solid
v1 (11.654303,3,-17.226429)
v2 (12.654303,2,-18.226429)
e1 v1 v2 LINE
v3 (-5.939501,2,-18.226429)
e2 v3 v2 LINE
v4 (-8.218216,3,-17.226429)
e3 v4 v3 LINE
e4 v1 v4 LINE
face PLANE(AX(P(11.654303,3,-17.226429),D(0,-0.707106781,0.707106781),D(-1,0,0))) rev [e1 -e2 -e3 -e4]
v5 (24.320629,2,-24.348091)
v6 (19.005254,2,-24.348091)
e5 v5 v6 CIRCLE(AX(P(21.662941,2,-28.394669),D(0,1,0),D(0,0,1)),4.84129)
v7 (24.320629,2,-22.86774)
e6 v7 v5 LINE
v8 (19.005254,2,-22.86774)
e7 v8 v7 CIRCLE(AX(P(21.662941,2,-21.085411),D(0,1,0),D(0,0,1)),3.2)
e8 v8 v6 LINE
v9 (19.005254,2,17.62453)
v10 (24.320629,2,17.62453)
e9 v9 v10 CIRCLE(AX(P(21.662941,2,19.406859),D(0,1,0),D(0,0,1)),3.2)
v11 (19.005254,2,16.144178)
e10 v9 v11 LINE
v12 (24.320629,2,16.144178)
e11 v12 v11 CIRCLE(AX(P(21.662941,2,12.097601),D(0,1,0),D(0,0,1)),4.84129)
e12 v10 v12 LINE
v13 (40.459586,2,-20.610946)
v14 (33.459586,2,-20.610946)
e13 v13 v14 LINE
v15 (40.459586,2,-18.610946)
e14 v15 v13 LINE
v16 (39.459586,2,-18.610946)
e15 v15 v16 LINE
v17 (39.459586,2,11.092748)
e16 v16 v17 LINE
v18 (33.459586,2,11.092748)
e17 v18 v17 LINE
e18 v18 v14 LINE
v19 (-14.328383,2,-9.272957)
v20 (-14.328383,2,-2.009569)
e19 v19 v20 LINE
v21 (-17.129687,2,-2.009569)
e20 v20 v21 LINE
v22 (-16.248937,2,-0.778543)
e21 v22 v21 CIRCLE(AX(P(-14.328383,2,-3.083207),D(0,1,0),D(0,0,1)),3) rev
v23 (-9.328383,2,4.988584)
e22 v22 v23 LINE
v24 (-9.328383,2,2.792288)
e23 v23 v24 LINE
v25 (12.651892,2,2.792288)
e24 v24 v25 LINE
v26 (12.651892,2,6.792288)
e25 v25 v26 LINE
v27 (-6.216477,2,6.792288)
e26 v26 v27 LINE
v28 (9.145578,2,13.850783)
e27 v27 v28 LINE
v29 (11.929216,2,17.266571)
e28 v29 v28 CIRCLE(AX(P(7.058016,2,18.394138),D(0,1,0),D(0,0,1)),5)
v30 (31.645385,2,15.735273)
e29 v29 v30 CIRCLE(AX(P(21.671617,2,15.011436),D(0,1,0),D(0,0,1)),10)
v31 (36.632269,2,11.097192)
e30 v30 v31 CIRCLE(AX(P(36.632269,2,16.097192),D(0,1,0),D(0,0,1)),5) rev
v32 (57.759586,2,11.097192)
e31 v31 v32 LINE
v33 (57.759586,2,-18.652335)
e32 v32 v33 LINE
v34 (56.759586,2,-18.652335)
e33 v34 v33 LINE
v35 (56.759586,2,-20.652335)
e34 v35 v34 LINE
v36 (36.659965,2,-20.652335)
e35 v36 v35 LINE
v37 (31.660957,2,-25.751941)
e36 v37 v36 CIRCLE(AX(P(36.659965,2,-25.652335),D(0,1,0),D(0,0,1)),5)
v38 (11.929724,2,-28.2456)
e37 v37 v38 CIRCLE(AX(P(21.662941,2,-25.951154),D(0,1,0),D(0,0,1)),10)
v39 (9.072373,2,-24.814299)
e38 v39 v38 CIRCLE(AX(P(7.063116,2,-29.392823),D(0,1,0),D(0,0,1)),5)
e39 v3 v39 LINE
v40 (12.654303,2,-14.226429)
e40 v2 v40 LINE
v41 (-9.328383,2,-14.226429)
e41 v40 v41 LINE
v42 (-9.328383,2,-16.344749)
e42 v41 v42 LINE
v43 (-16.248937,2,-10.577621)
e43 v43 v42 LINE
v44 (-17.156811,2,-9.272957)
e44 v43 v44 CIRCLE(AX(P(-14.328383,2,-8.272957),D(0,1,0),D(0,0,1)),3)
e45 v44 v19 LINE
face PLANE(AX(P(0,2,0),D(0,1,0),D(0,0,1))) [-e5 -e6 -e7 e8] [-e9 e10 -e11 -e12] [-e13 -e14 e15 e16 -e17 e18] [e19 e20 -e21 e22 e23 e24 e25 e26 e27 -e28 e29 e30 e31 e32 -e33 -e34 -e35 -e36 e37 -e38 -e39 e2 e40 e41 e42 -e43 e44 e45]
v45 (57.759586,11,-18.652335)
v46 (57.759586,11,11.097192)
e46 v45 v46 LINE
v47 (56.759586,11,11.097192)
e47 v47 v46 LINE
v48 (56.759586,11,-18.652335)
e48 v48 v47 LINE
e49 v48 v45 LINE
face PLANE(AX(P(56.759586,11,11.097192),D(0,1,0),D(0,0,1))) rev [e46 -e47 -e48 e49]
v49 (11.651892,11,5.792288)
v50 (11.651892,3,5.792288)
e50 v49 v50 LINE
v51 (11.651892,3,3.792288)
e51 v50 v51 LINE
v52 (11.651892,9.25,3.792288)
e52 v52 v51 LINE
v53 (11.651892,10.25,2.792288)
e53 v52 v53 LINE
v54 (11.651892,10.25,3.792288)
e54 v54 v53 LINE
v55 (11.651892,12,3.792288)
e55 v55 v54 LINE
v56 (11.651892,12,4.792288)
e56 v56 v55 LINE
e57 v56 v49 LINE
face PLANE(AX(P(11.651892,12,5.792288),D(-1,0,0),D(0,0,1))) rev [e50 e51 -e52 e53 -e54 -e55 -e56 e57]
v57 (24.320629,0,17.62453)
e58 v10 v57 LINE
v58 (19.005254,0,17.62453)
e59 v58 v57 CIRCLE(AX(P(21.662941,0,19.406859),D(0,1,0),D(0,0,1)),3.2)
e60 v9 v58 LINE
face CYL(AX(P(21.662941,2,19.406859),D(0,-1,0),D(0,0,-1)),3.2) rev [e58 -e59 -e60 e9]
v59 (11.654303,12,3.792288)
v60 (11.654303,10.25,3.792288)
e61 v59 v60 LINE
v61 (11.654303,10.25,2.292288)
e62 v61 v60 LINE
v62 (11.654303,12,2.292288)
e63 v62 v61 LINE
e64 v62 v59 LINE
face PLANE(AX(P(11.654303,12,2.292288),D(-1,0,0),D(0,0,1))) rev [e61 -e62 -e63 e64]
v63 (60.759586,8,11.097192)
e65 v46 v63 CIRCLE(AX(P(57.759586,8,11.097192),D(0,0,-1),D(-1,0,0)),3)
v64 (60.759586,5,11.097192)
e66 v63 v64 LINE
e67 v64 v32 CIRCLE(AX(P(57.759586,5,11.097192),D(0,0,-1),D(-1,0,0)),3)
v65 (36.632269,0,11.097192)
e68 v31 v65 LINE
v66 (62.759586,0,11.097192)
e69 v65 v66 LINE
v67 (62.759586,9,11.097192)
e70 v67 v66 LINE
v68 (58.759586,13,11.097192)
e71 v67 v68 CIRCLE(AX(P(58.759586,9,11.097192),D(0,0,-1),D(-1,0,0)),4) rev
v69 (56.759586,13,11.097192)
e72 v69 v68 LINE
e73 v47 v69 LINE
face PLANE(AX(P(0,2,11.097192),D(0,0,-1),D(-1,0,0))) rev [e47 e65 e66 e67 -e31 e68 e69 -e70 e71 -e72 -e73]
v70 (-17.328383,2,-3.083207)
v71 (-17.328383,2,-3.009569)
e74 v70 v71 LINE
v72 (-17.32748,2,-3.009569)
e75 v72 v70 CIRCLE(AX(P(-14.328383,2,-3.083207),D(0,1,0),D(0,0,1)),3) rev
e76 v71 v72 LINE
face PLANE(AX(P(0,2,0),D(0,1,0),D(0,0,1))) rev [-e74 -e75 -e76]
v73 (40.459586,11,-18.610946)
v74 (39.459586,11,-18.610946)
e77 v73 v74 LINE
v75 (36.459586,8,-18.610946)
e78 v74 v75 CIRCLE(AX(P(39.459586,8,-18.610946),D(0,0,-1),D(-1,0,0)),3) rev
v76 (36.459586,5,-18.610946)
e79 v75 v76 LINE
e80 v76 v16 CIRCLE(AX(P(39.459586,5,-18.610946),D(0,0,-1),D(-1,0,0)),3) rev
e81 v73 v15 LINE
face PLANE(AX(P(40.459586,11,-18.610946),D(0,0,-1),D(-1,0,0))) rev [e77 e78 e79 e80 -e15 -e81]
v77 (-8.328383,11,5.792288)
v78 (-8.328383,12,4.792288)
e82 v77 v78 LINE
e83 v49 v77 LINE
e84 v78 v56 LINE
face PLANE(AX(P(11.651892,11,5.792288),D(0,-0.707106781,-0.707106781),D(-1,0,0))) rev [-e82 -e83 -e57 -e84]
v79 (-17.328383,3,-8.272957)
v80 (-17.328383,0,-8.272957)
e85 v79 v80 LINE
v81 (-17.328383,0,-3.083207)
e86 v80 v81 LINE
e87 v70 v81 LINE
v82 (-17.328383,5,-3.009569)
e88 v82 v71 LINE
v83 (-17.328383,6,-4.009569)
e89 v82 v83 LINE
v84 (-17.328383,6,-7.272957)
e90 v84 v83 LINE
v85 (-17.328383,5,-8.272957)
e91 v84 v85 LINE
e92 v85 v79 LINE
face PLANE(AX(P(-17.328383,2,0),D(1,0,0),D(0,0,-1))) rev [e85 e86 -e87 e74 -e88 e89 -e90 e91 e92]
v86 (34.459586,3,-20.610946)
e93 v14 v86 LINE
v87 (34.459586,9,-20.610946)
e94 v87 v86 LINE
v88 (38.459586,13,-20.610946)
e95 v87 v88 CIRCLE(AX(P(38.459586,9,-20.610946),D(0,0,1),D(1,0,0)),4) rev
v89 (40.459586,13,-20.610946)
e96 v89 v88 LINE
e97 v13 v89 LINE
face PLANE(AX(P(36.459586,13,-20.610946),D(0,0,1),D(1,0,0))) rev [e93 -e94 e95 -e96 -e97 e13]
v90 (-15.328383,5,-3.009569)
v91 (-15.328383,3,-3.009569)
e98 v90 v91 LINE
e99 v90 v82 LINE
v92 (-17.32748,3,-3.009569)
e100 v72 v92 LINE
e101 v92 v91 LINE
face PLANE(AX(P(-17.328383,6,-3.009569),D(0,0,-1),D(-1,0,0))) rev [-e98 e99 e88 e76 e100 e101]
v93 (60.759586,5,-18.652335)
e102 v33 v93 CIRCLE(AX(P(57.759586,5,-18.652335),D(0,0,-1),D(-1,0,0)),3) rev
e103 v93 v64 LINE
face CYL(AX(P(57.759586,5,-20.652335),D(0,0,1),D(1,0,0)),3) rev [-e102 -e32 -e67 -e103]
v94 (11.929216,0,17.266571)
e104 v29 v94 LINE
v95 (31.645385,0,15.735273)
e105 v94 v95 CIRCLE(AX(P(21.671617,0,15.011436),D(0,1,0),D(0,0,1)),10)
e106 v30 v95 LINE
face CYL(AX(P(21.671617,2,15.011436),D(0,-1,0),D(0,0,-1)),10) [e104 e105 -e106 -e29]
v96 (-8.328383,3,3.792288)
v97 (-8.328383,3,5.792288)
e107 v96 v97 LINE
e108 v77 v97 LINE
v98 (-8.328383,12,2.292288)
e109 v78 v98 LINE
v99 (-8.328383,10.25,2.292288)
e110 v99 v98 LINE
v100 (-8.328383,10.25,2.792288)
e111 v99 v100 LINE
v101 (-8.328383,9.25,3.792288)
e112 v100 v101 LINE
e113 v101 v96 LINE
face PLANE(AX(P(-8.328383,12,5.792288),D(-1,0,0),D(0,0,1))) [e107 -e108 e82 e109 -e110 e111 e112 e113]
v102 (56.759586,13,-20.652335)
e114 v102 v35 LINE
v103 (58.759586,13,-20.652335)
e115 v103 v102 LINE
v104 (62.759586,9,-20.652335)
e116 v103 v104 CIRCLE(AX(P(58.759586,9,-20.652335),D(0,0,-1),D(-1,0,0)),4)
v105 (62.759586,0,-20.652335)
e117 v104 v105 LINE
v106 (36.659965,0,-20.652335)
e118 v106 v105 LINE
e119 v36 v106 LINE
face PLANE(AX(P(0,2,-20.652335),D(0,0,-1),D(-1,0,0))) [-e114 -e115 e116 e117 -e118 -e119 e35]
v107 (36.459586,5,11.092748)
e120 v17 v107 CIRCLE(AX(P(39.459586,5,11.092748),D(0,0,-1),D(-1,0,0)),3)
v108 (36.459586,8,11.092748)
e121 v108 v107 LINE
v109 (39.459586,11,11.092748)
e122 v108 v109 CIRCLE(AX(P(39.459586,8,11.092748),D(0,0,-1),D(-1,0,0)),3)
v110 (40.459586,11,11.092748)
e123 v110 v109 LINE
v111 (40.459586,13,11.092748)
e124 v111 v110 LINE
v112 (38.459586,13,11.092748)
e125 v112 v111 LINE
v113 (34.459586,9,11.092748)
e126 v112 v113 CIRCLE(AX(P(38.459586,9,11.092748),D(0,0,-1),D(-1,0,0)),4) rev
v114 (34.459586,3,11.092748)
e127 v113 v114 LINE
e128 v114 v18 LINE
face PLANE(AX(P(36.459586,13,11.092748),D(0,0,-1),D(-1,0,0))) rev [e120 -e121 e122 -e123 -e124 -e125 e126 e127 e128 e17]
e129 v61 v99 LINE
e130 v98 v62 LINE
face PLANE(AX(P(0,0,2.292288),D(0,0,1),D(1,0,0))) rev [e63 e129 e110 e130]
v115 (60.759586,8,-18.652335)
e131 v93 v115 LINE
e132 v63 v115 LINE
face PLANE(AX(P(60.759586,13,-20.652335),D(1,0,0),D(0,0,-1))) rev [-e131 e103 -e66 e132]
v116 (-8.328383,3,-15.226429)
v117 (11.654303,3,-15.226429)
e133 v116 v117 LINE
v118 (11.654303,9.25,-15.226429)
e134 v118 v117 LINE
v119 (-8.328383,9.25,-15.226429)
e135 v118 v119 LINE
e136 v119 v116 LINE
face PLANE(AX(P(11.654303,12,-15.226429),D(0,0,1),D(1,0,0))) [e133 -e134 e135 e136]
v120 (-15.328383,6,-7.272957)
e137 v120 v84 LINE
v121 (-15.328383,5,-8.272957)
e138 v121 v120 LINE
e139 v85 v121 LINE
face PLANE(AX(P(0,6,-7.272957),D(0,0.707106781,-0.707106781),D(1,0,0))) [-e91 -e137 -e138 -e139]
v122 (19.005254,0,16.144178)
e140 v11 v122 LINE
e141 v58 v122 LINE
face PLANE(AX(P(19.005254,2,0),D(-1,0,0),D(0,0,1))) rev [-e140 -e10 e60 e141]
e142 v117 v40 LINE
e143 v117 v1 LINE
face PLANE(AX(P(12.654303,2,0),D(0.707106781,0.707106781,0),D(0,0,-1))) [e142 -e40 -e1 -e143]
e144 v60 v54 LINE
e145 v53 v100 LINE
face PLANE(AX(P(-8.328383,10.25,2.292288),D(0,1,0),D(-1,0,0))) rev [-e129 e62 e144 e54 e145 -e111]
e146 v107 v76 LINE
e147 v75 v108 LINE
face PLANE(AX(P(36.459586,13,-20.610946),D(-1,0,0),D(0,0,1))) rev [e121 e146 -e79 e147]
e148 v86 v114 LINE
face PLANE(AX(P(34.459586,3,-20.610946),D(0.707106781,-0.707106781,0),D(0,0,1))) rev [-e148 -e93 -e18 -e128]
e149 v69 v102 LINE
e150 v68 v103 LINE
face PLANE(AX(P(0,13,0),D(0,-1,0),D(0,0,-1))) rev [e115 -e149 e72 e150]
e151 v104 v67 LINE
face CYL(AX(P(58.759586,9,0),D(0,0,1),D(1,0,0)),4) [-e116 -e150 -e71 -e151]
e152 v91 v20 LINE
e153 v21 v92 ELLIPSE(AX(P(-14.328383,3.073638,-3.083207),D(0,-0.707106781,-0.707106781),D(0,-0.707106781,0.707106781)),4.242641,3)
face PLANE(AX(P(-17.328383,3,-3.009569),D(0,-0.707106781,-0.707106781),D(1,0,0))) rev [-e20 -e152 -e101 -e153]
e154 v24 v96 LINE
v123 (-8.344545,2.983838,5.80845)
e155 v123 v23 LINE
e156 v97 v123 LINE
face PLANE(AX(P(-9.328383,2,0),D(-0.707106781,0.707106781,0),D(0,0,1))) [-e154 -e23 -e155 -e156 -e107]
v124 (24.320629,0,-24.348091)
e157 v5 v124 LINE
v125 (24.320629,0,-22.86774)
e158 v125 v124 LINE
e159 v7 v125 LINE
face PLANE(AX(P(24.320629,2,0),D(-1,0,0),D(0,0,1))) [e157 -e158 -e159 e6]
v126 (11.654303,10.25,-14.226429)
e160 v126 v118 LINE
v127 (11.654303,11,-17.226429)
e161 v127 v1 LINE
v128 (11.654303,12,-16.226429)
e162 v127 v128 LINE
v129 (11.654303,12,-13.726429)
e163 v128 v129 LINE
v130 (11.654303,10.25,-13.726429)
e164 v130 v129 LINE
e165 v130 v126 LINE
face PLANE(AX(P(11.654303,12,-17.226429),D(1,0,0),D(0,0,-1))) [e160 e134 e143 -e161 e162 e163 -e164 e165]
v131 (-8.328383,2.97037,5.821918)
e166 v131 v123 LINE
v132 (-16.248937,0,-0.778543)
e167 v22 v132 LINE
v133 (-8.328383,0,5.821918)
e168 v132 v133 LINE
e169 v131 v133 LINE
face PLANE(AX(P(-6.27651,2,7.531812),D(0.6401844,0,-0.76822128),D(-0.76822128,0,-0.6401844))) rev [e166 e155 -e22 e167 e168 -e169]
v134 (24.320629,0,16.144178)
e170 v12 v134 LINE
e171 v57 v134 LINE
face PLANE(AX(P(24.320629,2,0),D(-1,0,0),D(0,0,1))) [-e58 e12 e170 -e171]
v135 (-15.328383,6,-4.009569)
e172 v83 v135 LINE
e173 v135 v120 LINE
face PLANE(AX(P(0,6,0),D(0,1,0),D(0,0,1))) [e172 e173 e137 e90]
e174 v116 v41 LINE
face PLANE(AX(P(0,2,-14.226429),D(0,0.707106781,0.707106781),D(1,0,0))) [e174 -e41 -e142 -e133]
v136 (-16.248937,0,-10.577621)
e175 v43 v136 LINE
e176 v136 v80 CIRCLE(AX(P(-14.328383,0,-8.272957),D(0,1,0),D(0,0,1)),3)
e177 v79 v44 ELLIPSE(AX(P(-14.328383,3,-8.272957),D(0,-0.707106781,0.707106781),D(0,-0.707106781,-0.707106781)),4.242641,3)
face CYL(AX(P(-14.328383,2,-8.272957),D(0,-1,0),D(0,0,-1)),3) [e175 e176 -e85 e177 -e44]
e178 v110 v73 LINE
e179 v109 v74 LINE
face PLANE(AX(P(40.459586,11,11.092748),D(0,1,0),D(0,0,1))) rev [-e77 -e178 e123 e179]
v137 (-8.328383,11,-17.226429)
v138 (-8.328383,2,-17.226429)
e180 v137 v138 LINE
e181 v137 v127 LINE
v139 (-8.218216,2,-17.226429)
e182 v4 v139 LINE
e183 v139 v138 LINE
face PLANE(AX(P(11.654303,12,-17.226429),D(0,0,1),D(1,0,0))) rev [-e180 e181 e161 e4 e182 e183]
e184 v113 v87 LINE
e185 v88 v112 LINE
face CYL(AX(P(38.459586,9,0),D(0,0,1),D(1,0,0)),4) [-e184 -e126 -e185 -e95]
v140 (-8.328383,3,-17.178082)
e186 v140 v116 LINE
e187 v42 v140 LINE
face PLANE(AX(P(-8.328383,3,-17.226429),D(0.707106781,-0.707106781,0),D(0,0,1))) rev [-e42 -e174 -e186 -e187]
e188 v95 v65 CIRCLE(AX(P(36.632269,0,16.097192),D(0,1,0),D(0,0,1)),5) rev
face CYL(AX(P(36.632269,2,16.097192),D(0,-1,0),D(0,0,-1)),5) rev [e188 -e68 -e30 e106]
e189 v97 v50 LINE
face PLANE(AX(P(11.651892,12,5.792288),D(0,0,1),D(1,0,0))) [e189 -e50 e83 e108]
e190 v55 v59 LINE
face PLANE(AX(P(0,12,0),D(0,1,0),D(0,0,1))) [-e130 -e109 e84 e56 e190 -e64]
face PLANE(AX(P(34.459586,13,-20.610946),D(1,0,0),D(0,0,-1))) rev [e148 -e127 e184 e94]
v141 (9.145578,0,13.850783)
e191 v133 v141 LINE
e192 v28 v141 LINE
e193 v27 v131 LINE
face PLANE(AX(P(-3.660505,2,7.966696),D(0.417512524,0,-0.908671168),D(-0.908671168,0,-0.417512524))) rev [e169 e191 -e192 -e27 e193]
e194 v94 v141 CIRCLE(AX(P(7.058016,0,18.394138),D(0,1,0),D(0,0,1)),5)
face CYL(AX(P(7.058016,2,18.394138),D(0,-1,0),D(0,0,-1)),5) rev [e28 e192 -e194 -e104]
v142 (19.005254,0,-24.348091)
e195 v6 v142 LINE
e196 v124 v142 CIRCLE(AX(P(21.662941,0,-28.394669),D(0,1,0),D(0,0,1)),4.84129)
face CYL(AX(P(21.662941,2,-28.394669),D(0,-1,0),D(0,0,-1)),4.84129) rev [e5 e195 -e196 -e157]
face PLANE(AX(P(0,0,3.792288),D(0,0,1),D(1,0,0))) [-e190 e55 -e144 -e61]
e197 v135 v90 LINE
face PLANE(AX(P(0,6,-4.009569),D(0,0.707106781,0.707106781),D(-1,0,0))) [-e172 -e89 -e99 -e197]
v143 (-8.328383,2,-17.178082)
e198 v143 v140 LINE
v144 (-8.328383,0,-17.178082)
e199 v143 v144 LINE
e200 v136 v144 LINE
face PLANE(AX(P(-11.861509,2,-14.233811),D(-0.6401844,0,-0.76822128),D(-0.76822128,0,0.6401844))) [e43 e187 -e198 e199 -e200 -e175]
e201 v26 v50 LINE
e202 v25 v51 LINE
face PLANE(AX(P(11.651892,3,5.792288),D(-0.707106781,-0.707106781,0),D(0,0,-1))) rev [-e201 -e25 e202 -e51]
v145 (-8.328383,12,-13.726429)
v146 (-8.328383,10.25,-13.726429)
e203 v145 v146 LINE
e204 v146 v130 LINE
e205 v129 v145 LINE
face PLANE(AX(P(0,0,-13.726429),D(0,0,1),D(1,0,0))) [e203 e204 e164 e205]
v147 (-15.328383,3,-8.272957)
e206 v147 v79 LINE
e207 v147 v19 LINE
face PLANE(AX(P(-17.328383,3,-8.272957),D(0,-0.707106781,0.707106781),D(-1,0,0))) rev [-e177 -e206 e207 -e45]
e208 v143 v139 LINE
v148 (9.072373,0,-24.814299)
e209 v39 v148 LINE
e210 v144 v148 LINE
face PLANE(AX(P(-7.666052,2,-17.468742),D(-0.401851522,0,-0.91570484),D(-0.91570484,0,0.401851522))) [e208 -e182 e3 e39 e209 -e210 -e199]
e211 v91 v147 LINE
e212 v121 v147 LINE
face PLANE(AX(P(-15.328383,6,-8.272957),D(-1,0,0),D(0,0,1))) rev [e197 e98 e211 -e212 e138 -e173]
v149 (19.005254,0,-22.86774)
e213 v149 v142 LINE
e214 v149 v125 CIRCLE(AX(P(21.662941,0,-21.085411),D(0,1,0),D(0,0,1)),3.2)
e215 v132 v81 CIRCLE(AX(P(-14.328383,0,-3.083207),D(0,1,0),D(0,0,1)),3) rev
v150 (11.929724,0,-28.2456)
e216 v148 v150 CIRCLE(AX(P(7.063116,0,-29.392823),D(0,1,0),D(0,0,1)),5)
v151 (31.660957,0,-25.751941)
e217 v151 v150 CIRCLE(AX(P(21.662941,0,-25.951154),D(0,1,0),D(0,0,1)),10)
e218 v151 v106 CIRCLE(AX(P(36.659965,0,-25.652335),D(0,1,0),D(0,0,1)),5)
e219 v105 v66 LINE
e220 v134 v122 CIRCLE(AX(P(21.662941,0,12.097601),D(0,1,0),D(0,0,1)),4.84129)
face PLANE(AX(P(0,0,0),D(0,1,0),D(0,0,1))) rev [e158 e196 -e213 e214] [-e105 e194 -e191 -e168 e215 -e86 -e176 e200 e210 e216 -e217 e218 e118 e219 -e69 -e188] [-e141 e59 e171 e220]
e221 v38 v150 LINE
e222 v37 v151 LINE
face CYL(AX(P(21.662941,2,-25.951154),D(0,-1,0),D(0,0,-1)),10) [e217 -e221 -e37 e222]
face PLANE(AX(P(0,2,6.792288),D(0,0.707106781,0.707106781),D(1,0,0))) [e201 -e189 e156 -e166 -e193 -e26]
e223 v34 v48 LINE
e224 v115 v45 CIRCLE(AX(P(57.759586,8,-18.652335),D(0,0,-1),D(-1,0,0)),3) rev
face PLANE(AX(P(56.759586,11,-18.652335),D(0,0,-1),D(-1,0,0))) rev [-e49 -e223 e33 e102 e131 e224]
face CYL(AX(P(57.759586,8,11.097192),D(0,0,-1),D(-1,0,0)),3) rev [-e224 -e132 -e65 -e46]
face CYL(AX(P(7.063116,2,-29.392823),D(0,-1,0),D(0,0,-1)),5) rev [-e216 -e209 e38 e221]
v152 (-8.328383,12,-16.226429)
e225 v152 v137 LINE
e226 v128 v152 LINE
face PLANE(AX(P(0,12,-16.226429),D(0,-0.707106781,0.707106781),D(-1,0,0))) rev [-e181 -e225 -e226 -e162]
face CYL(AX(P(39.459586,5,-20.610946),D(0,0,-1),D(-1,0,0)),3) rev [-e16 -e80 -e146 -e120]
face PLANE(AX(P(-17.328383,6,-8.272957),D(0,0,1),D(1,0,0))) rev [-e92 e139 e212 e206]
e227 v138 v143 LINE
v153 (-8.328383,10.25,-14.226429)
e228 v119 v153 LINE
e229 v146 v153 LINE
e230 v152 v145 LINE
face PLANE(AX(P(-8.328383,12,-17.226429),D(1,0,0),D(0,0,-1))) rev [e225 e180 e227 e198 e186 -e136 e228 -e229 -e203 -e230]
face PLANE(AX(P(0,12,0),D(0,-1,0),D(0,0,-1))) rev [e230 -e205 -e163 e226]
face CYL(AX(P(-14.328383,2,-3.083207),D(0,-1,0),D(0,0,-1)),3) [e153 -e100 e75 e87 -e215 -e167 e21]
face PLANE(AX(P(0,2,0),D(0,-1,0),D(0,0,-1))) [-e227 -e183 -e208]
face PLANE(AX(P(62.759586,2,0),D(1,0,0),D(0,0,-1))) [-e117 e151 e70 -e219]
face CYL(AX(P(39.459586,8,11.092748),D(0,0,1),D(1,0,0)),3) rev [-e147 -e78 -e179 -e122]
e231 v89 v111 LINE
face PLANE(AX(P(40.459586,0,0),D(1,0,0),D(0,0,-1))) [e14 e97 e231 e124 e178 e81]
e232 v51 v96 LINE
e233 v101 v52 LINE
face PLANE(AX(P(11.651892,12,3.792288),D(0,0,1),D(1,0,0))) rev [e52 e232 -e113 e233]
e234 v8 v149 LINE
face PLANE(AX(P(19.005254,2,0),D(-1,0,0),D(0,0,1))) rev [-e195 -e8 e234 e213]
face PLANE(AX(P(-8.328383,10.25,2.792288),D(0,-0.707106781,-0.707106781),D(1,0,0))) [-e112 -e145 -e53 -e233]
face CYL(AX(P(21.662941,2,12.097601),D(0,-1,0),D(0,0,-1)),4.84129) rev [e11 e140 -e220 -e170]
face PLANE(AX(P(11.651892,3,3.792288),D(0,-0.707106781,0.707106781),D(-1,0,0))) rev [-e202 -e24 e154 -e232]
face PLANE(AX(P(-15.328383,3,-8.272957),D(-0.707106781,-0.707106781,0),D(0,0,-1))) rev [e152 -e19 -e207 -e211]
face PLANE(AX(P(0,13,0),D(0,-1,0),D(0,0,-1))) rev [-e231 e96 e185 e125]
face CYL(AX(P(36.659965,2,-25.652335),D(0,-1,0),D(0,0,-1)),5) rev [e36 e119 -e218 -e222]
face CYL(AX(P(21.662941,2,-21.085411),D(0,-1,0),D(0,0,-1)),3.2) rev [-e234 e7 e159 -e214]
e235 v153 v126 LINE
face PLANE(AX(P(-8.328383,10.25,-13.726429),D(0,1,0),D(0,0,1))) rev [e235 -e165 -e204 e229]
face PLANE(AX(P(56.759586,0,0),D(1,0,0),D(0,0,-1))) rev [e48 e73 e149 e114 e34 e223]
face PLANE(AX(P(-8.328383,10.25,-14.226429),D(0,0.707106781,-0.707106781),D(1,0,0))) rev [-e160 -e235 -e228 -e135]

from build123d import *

# Parameters (mm, degrees)
BOSS_EXTRUDE3_DEPTH  = 2
SKETCH2_W            = 19.982686102
SKETCH2_H            = 2
SKETCH2_W_2          = 19.980275276
BOSS_EXTRUDE4_DEPTH  = 10
SKETCH4_W            = 19.982686102
SKETCH4_H            = 1.75
BOSS_EXTRUDE6_DEPTH  = 1.5
SKETCH5_W            = 19.982686102
SKETCH5_H            = 1.75
BOSS_EXTRUDE7_DEPTH  = 1.5
SKETCH6_W            = 2
SKETCH6_H            = 31.703693322
SKETCH6_H_2          = 31.749526842
BOSS_EXTRUDE8_DEPTH  = 11
SKETCH7_W            = 31.749526842
SKETCH7_H            = 2
BOSS_EXTRUDE9_DEPTH  = 4
SKETCH8_W            = 31.703693322
SKETCH8_H            = 2
BOSS_EXTRUDE10_DEPTH = 4
SKETCH9_W            = 2
SKETCH9_H            = 9
BOSS_EXTRUDE11_DEPTH = 4
SKETCH11_W           = 2
SKETCH11_H           = 9
BOSS_EXTRUDE12_DEPTH = 4
FILLET3_R            = 3
FILLET4_R            = 4
FILLET5_R            = 4
CHAMFER3_SIZE        = 1
SKETCH13_W           = 2
SKETCH13_H           = 5.263388165
BOSS_EXTRUDE13_DEPTH = 4
CHAMFER4_SIZE        = 1
CHAMFER5_SIZE        = 1


with BuildPart() as part:
    # Sketch1 → Boss-Extrude3 (new body)
    with BuildSketch(Plane(origin=(0, 0, 0), x_dir=(1, 0, 0), z_dir=(0, 1, 0))):
        with BuildLine():
            Line((-8.328383402, 17.178082192), (-11.926539406, 14.179618856))
            Line((-11.926539406, 14.179618856), (-16.248936601, 10.577621193))
            ThreePointArc((-16.248936601, 10.577621193), (-17.045151666, 9.545423543), (-17.328383402, 8.272957354))
            Line((-17.328383402, 8.272957354), (-17.328383402, 3.08320703))
            ThreePointArc((-17.328383402, 3.08320703), (-17.045151666, 1.810740841), (-16.248936601, 0.778543191))
            Line((-16.248936601, 0.778543191), (-11.926539406, -2.823454472))
            Line((-11.926539406, -2.823454472), (-8.328383402, -5.821917808))
            Line((-8.328383402, -5.821917808), (9.145578492, -13.850782578))
            ThreePointArc((9.145578492, -13.850782578), (10.93396709, -15.23549913), (11.929216114, -17.266571036))
            ThreePointArc((11.929216114, -17.266571036), (22.445955603, -24.981411148), (31.645385182, -15.735273423))
            ThreePointArc((31.645385182, -15.735273423), (33.227096416, -12.435935871), (36.632269474, -11.097192))
            Line((36.632269474, -11.097192), (62.759585841, -11.097192))
            Line((62.759585841, -11.097192), (62.759585841, 20.652334842))
            Line((62.759585841, 20.652334842), (36.659964719, 20.652334842))
            ThreePointArc((36.659964719, 20.652334842), (33.089388299, 22.15219427), (31.660956961, 25.751941231))
            ThreePointArc((31.660956961, 25.751941231), (22.916780781, 35.872236959), (11.929724224, 28.245600027))
            ThreePointArc((11.929724224, 28.245600027), (10.905359885, 26.19326698), (9.072373225, 24.814298837))
            Line((9.072373225, 24.814298837), (-8.328383402, 17.178082192))
        make_face()
        with BuildLine():
            Line((24.320629097, -16.144178085), (24.320629097, -17.62452967))
            ThreePointArc((24.320629097, -17.62452967), (21.662941444, -22.60685858), (19.005253792, -17.62452967))
            Line((19.005253792, -17.62452967), (19.005253792, -16.144178085))
            ThreePointArc((19.005253792, -16.144178085), (21.662941444, -7.256310151), (24.320629097, -16.144178085))
        make_face(mode=Mode.SUBTRACT)
        with BuildLine():
            Line((24.320629097, 24.348091169), (24.320629097, 22.867739584))
            ThreePointArc((24.320629097, 22.867739584), (21.662941444, 17.885410674), (19.005253792, 22.867739584))
            Line((19.005253792, 22.867739584), (19.005253792, 24.348091169))
            ThreePointArc((19.005253792, 24.348091169), (21.662941444, 33.235959102), (24.320629097, 24.348091169))
        make_face(mode=Mode.SUBTRACT)
    extrude(amount=BOSS_EXTRUDE3_DEPTH)

    # Sketch2 → Boss-Extrude4 (add)
    with BuildSketch(Plane(origin=(0, 2, 0), x_dir=(1, 0, 0), z_dir=(0, 1, 0))):
        with Locations((1.662959649, 16.226428568)):
            Rectangle(SKETCH2_W, SKETCH2_H)
        with Locations((1.661754236, -4.792288058)):
            Rectangle(SKETCH2_W_2, SKETCH2_H)
    extrude(amount=BOSS_EXTRUDE4_DEPTH)

    # Sketch4 → Boss-Extrude6 (add)
    with BuildSketch(Plane.XY.offset(-15.226428568)):
        with Locations((1.662959649, 11.125)):
            Rectangle(SKETCH4_W, SKETCH4_H)
    extrude(amount=BOSS_EXTRUDE6_DEPTH)

    # Sketch5 → Boss-Extrude7 (add)
    with BuildSketch(Plane(origin=(0, 0, 3.792288058), x_dir=(-1, 0, 0), z_dir=(0, 0, -1))):
        with Locations((-1.662959649, 11.125)):
            Rectangle(SKETCH5_W, SKETCH5_H)
    extrude(amount=BOSS_EXTRUDE7_DEPTH)

    # Sketch6 → Boss-Extrude8 (add)
    with BuildSketch(Plane(origin=(0, 2, 0), x_dir=(1, 0, 0), z_dir=(0, 1, 0))):
        with Locations((35.459585841, 4.759099079)):
            Rectangle(SKETCH6_W, SKETCH6_H)
        with Locations((61.759585841, 4.777571421)):
            Rectangle(SKETCH6_W, SKETCH6_H_2)
    extrude(amount=BOSS_EXTRUDE8_DEPTH)

    # Sketch7 → Boss-Extrude9 (add)
    with BuildSketch(Plane.ZY.offset(-60.759585841)):
        with Locations((-4.777571421, 12)):
            Rectangle(SKETCH7_W, SKETCH7_H)
    extrude(amount=BOSS_EXTRUDE9_DEPTH)

    # Sketch8 → Boss-Extrude10 (add)
    with BuildSketch(Plane(origin=(36.459585841, 0, 0), x_dir=(0, 0, -1), z_dir=(1, 0, 0))):
        with Locations((4.759099079, 12)):
            Rectangle(SKETCH8_W, SKETCH8_H)
    extrude(amount=BOSS_EXTRUDE10_DEPTH)

    # Sketch9 → Boss-Extrude11 (add)
    with BuildSketch(Plane(origin=(36.459585841, 0, 0), x_dir=(0, 0, -1), z_dir=(1, 0, 0))):
        with Locations((19.61094574, 6.5)):
            Rectangle(SKETCH9_W, SKETCH9_H)
    extrude(amount=BOSS_EXTRUDE11_DEPTH)

    # Sketch11 → Boss-Extrude12 (add)
    with BuildSketch(Plane.ZY.offset(-60.759585841)):
        with Locations((-19.652334842, 6.5)):
            Rectangle(SKETCH11_W, SKETCH11_H)
    extrude(amount=BOSS_EXTRUDE12_DEPTH)

    # Fillet3
    fillet3_edges = [part.edges().sort_by_distance(p)[0] for p in [
        (36.459585841, 2, -3.759099079),
        (36.459585841, 11, -3.759099079),
        (60.759585841, 11, -3.777571421),
        (60.759585841, 2, -3.777571421),
    ]]
    fillet(fillet3_edges, radius=FILLET3_R)

    # Fillet4
    fillet4_edges = [part.edges().sort_by_distance(p)[0] for p in [
        (62.759585841, 13, -4.777571421),
    ]]
    fillet(fillet4_edges, radius=FILLET4_R)

    # Fillet5
    fillet5_edges = [part.edges().sort_by_distance(p)[0] for p in [
        (34.459585841, 13, -4.759099079),
    ]]
    fillet(fillet5_edges, radius=FILLET5_R)

    # Chamfer3
    # the kernel refuses this chamfer: 1 mm, written as the material it adds along each edge
    with BuildSketch(Plane(origin=(34.459585841, 2, -20.61094574), x_dir=(0, 1, 0), z_dir=(0, 0, 1))) as chamfer3_piece_1:
        Polygon((CHAMFER3_SIZE, 0), (0, CHAMFER3_SIZE), (0, 0), align=None)
    extrude(amount=31.703693323)
    with BuildSketch(Plane(origin=(11.6543027, 2, -17.226428568), x_dir=(0, 0, -1), z_dir=(-1, 0, 0))) as chamfer3_piece_2_section:
        Polygon((CHAMFER3_SIZE, 0), (0, -CHAMFER3_SIZE), (0, 0), align=None)
    chamfer3_piece_2 = extrude(amount=22.444201507, mode=Mode.PRIVATE)
    chamfer3_piece_2 = split(chamfer3_piece_2, bisect_by=Plane(origin=(8.445196081, 2, -24.539065946), z_dir=(0.40185152236711835, 0, 0.9157048399846042)), keep=Keep.TOP, mode=Mode.PRIVATE)
    add(chamfer3_piece_2)
    with BuildSketch(Plane(origin=(11.651891874, 2, 5.792288058), x_dir=(0, 0, 1), z_dir=(-1, 0, 0))) as chamfer3_piece_3_section:
        Polygon((CHAMFER3_SIZE, 0), (0, CHAMFER3_SIZE), (0, 0), align=None)
    chamfer3_piece_3 = extrude(amount=19.980275276, mode=Mode.PRIVATE)
    chamfer3_piece_3 = split(chamfer3_piece_3, bisect_by=Plane(origin=(8.15775509, 2, 13.396901508), z_dir=(0.4175125238289849, 0, -0.9086711684905334)), keep=Keep.TOP, mode=Mode.PRIVATE)
    add(chamfer3_piece_3)

    # Sketch13 → Boss-Extrude13 (add)
    with BuildSketch(Plane(origin=(0, 2, 0), x_dir=(1, 0, 0), z_dir=(0, 1, 0))):
        with Locations((-16.328383402, 5.641263272)):
            Rectangle(SKETCH13_W, SKETCH13_H)
    extrude(amount=BOSS_EXTRUDE13_DEPTH)

    # Chamfer4
    # the kernel refuses this chamfer: 1 mm, written as the material it adds along each edge
    with BuildSketch(Plane(origin=(11.6543027, 10.25, -15.226428568), x_dir=(0, -1, 0), z_dir=(-1, 0, 0))) as chamfer4_piece_1:
        Polygon((CHAMFER4_SIZE, 0), (0, CHAMFER4_SIZE), (0, 0), align=None)
    extrude(amount=19.982686102)
    with BuildSketch(Plane(origin=(11.651891874, 10.25, 3.792288058), x_dir=(0, -1, 0), z_dir=(-1, 0, 0))) as chamfer4_piece_2:
        Polygon((CHAMFER4_SIZE, 0), (0, -CHAMFER4_SIZE), (0, 0), align=None)
    extrude(amount=19.980275276)
    with BuildSketch(Plane(origin=(-19.90006639, 2, -8.272957354), x_dir=(0, 0, -1), z_dir=(1, 0, 0))) as chamfer4_piece_3_section:
        Polygon((CHAMFER4_SIZE, 0), (0, CHAMFER4_SIZE), (0, 0), align=None)
    chamfer4_piece_3 = extrude(amount=4.571682988, mode=Mode.PRIVATE)
    chamfer4_piece_3 = chamfer4_piece_3 & Plane(origin=(-14.328383402, 2, -8.272957354), x_dir=(-0.6401843996644775, 0, -0.7682212795973778), z_dir=(0, -1, 0)) * Cylinder(3, 14, mode=Mode.PRIVATE)
    add(chamfer4_piece_3)
    with BuildSketch(Plane(origin=(-15.328383402, 2, -3.009569189), x_dir=(0, 0, 1), z_dir=(-1, 0, 0))) as chamfer4_piece_4_section:
        Polygon((CHAMFER4_SIZE, 0), (0, CHAMFER4_SIZE), (0, 0), align=None)
    chamfer4_piece_4 = extrude(amount=4.570779097, mode=Mode.PRIVATE)
    chamfer4_piece_4 = chamfer4_piece_4 & Plane(origin=(-14.328383402, 2, -3.08320703), x_dir=(-1, 0, 0), z_dir=(0, -1, 0)) * Cylinder(3, 14, mode=Mode.PRIVATE)
    add(chamfer4_piece_4)
    with BuildSketch(Plane(origin=(-15.328383402, 2, -8.272957354), x_dir=(1, 0, 0), z_dir=(0, 0, 1))) as chamfer4_piece_5:
        Polygon((CHAMFER4_SIZE, 0), (0, CHAMFER4_SIZE), (0, 0), align=None)
    extrude(amount=5.263388164)
    with BuildSketch(Plane(origin=(11.651891874, 2, 9.363971046), x_dir=(0, 1, 0), z_dir=(0, 0, -1))) as chamfer4_piece_6_section:
        Polygon((CHAMFER4_SIZE, 0), (0, CHAMFER4_SIZE), (0, 0), align=None)
    chamfer4_piece_6 = extrude(amount=5.571682988, mode=Mode.PRIVATE)
    chamfer4_piece_6 = split(chamfer4_piece_6, bisect_by=Plane(origin=(11.651891874, 0.714158506, 8.078129552), z_dir=(0, -0.7071067811865476, -0.7071067811865476)), keep=Keep.TOP, mode=Mode.PRIVATE)
    add(chamfer4_piece_6)
    with BuildSketch(Plane(origin=(-8.328383402, 2, 3.792288058), x_dir=(0, 1, 0), z_dir=(0, 0, 1))) as chamfer4_piece_7_section:
        Polygon((CHAMFER4_SIZE, 0), (0, CHAMFER4_SIZE), (0, 0), align=None)
    chamfer4_piece_7 = extrude(amount=4.601312738, mode=Mode.PRIVATE)
    chamfer4_piece_7 = split(chamfer4_piece_7, bisect_by=Plane(origin=(-8.328383402, 3.5, 5.292288058), z_dir=(0, -0.7071067811865476, -0.7071067811865476)), keep=Keep.TOP, mode=Mode.PRIVATE)
    chamfer4_piece_7 = split(chamfer4_piece_7, bisect_by=Plane(origin=(-9.326561968, 2, 4.990102337), z_dir=(0.6401843996644799, 0, -0.7682212795973757)), keep=Keep.TOP, mode=Mode.PRIVATE)
    add(chamfer4_piece_7)
    with BuildSketch(Plane(origin=(-8.328383402, 2, 3.792288058), x_dir=(0, 0, -1), z_dir=(1, 0, 0))) as chamfer4_piece_8:
        Polygon((CHAMFER4_SIZE, 0), (0, CHAMFER4_SIZE), (0, 0), align=None)
    extrude(amount=19.980275276)
    with BuildSketch(Plane(origin=(11.6543027, 2, -15.226428568), x_dir=(1, 0, 0), z_dir=(0, 0, -1))) as chamfer4_piece_9_section:
        Polygon((CHAMFER4_SIZE, 0), (0, -CHAMFER4_SIZE), (0, 0), align=None)
    chamfer4_piece_9 = extrude(amount=5.571682988, mode=Mode.PRIVATE)
    chamfer4_piece_9 = split(chamfer4_piece_9, bisect_by=Plane(origin=(11.6543027, 3.5, -16.726428568), z_dir=(0, -0.7071067811865476, 0.7071067811865476)), keep=Keep.TOP, mode=Mode.PRIVATE)
    add(chamfer4_piece_9)
    with BuildSketch(Plane(origin=(-8.328383402, 2, -19.74976518), x_dir=(-1, 0, 0), z_dir=(0, 0, 1))) as chamfer4_piece_10_section:
        Polygon((CHAMFER4_SIZE, 0), (0, -CHAMFER4_SIZE), (0, 0), align=None)
    chamfer4_piece_10 = extrude(amount=4.523336611, mode=Mode.PRIVATE)
    chamfer4_piece_10 = split(chamfer4_piece_10, bisect_by=Plane(origin=(-7.063621277, 2, -18.232050629), z_dir=(0.6401843996644802, 0, 0.7682212795973757)), keep=Keep.TOP, mode=Mode.PRIVATE)
    add(chamfer4_piece_10)
    with BuildSketch(Plane(origin=(-8.328383402, 2, -15.226428568), x_dir=(0, 0, 1), z_dir=(1, 0, 0))) as chamfer4_piece_11:
        Polygon((CHAMFER4_SIZE, 0), (0, -CHAMFER4_SIZE), (0, 0), align=None)
    extrude(amount=19.982686102)
    with BuildSketch(Plane(origin=(-15.328383402, 2, -10.844640342), x_dir=(1, 0, 0), z_dir=(0, 0, 1))) as chamfer4_piece_12a_section:
        Polygon((CHAMFER4_SIZE, 0), (0, CHAMFER4_SIZE), (0, 0), align=None)
    chamfer4_piece_12a = extrude(amount=7.835071152, mode=Mode.PRIVATE)
    chamfer4_piece_12a = split(chamfer4_piece_12a, bisect_by=Plane(origin=(-15.328383402, 2, -8.272957354), z_dir=(0, 0, -1)), keep=Keep.TOP, mode=Mode.PRIVATE)
    with BuildSketch(Plane(origin=(-17.328383402, 2, -8.272957354), x_dir=(0, 0, -1), z_dir=(1, 0, 0))) as chamfer4_piece_12b_section:
        Polygon((CHAMFER4_SIZE, 0), (0, CHAMFER4_SIZE), (0, 0), align=None)
    chamfer4_piece_12b = extrude(amount=4.571682988, mode=Mode.PRIVATE)
    chamfer4_piece_12b = split(chamfer4_piece_12b, bisect_by=Plane(origin=(-15.328383402, 2, -8.272957354), z_dir=(1, 0, 0)), keep=Keep.TOP, mode=Mode.PRIVATE)
    chamfer4_piece_12 = chamfer4_piece_12a & chamfer4_piece_12b
    add(chamfer4_piece_12)
    with BuildSketch(Plane(origin=(-12.756700414, 2, -3.009569189), x_dir=(0, 0, 1), z_dir=(-1, 0, 0))) as chamfer4_piece_13a_section:
        Polygon((CHAMFER4_SIZE, 0), (0, CHAMFER4_SIZE), (0, 0), align=None)
    chamfer4_piece_13a = extrude(amount=7.142462085, mode=Mode.PRIVATE)
    chamfer4_piece_13a = split(chamfer4_piece_13a, bisect_by=Plane(origin=(-15.328383402, 2, -3.009569189), z_dir=(1, 0, 0)), keep=Keep.TOP, mode=Mode.PRIVATE)
    with BuildSketch(Plane(origin=(-15.328383402, 2, -8.272957354), x_dir=(1, 0, 0), z_dir=(0, 0, 1))) as chamfer4_piece_13b_section:
        Polygon((CHAMFER4_SIZE, 0), (0, CHAMFER4_SIZE), (0, 0), align=None)
    chamfer4_piece_13b = extrude(amount=7.835071152, mode=Mode.PRIVATE)
    chamfer4_piece_13b = split(chamfer4_piece_13b, bisect_by=Plane(origin=(-15.328383402, 2, -3.009569189), z_dir=(0, 0, 1)), keep=Keep.TOP, mode=Mode.PRIVATE)
    chamfer4_piece_13 = chamfer4_piece_13a & chamfer4_piece_13b
    add(chamfer4_piece_13)
    with BuildSketch(Plane(origin=(11.651891874, 2, 9.363971046), x_dir=(0, 1, 0), z_dir=(0, 0, -1))) as chamfer4_piece_14a_section:
        Polygon((CHAMFER4_SIZE, 0), (0, CHAMFER4_SIZE), (0, 0), align=None)
    chamfer4_piece_14a = extrude(amount=8.143365976, mode=Mode.PRIVATE)
    chamfer4_piece_14a = split(chamfer4_piece_14a, bisect_by=Plane(origin=(11.651891874, 2, 3.792288058), z_dir=(0, 0, -1)), keep=Keep.TOP, mode=Mode.PRIVATE)
    with BuildSketch(Plane(origin=(-8.328383402, 2, 3.792288058), x_dir=(0, 0, -1), z_dir=(1, 0, 0))) as chamfer4_piece_14b_section:
        Polygon((CHAMFER4_SIZE, 0), (0, CHAMFER4_SIZE), (0, 0), align=None)
    chamfer4_piece_14b = extrude(amount=22.551958264, mode=Mode.PRIVATE)
    chamfer4_piece_14b = split(chamfer4_piece_14b, bisect_by=Plane(origin=(11.651891874, 2, 3.792288058), z_dir=(1, 0, 0)), keep=Keep.TOP, mode=Mode.PRIVATE)
    chamfer4_piece_14 = chamfer4_piece_14a & chamfer4_piece_14b
    add(chamfer4_piece_14)
    with BuildSketch(Plane(origin=(-8.328383402, 2, 1.22060507), x_dir=(0, 1, 0), z_dir=(0, 0, 1))) as chamfer4_piece_15a_section:
        Polygon((CHAMFER4_SIZE, 0), (0, CHAMFER4_SIZE), (0, 0), align=None)
    chamfer4_piece_15a = extrude(amount=7.172995726, mode=Mode.PRIVATE)
    chamfer4_piece_15a = split(chamfer4_piece_15a, bisect_by=Plane(origin=(-8.328383402, 2, 3.792288058), z_dir=(0, 0, -1)), keep=Keep.TOP, mode=Mode.PRIVATE)
    with BuildSketch(Plane(origin=(-10.90006639, 2, 3.792288058), x_dir=(0, 0, -1), z_dir=(1, 0, 0))) as chamfer4_piece_15b_section:
        Polygon((CHAMFER4_SIZE, 0), (0, CHAMFER4_SIZE), (0, 0), align=None)
    chamfer4_piece_15b = extrude(amount=22.551958264, mode=Mode.PRIVATE)
    chamfer4_piece_15b = split(chamfer4_piece_15b, bisect_by=Plane(origin=(-8.328383402, 2, 3.792288058), z_dir=(-1, 0, 0)), keep=Keep.TOP, mode=Mode.PRIVATE)
    chamfer4_piece_15b = split(chamfer4_piece_15b, bisect_by=Plane(origin=(-10.844276518, 2, 3.725340212), z_dir=(0.6401843996644799, 0, -0.7682212795973757)), keep=Keep.TOP, mode=Mode.PRIVATE)
    chamfer4_piece_15 = chamfer4_piece_15a & chamfer4_piece_15b
    add(chamfer4_piece_15)
    with BuildSketch(Plane(origin=(-8.328383402, 2, -15.226428568), x_dir=(0, 0, 1), z_dir=(1, 0, 0))) as chamfer4_piece_16a_section:
        Polygon((CHAMFER4_SIZE, 0), (0, -CHAMFER4_SIZE), (0, 0), align=None)
    chamfer4_piece_16a = extrude(amount=22.55436909, mode=Mode.PRIVATE)
    chamfer4_piece_16a = split(chamfer4_piece_16a, bisect_by=Plane(origin=(11.6543027, 2, -15.226428568), z_dir=(1, 0, 0)), keep=Keep.TOP, mode=Mode.PRIVATE)
    with BuildSketch(Plane(origin=(11.6543027, 2, -12.65474558), x_dir=(1, 0, 0), z_dir=(0, 0, -1))) as chamfer4_piece_16b_section:
        Polygon((CHAMFER4_SIZE, 0), (0, -CHAMFER4_SIZE), (0, 0), align=None)
    chamfer4_piece_16b = extrude(amount=8.143365976, mode=Mode.PRIVATE)
    chamfer4_piece_16b = split(chamfer4_piece_16b, bisect_by=Plane(origin=(11.6543027, 2, -15.226428568), z_dir=(0, 0, 1)), keep=Keep.TOP, mode=Mode.PRIVATE)
    chamfer4_piece_16 = chamfer4_piece_16a & chamfer4_piece_16b
    add(chamfer4_piece_16)
    with BuildSketch(Plane(origin=(-8.328383402, 2, -19.74976518), x_dir=(-1, 0, 0), z_dir=(0, 0, 1))) as chamfer4_piece_17a_section:
        Polygon((CHAMFER4_SIZE, 0), (0, -CHAMFER4_SIZE), (0, 0), align=None)
    chamfer4_piece_17a = extrude(amount=7.095019599, mode=Mode.PRIVATE)
    chamfer4_piece_17a = split(chamfer4_piece_17a, bisect_by=Plane(origin=(-8.328383402, 2, -15.226428568), z_dir=(0, 0, 1)), keep=Keep.TOP, mode=Mode.PRIVATE)
    with BuildSketch(Plane(origin=(-10.90006639, 2, -15.226428568), x_dir=(0, 0, 1), z_dir=(1, 0, 0))) as chamfer4_piece_17b_section:
        Polygon((CHAMFER4_SIZE, 0), (0, -CHAMFER4_SIZE), (0, 0), align=None)
    chamfer4_piece_17b = extrude(amount=22.55436909, mode=Mode.PRIVATE)
    chamfer4_piece_17b = split(chamfer4_piece_17b, bisect_by=Plane(origin=(-10.805927603, 2, -15.113462024), z_dir=(0.6401843996644802, 0, 0.7682212795973757)), keep=Keep.TOP, mode=Mode.PRIVATE)
    chamfer4_piece_17b = split(chamfer4_piece_17b, bisect_by=Plane(origin=(-8.328383402, 2, -15.226428568), z_dir=(-1, 0, 0)), keep=Keep.TOP, mode=Mode.PRIVATE)
    chamfer4_piece_17 = chamfer4_piece_17a & chamfer4_piece_17b
    add(chamfer4_piece_17)
    # the kernel refuses this chamfer: 1 mm, written as the material it takes off along each edge
    with BuildSketch(Plane(origin=(14.223574861, 12, 5.792288058), x_dir=(0, 0, -1), z_dir=(-1, 0, 0))) as chamfer4_2_piece_1:
        Polygon((CHAMFER4_SIZE, 0), (0, CHAMFER4_SIZE), (0, 0), align=None)
    extrude(amount=25.123641252, mode=Mode.SUBTRACT)
    with BuildSketch(Plane(origin=(14.225985688, 12, -17.226428568), x_dir=(0, 0, 1), z_dir=(-1, 0, 0))) as chamfer4_2_piece_2:
        Polygon((CHAMFER4_SIZE, 0), (0, -CHAMFER4_SIZE), (0, 0), align=None)
    extrude(amount=25.126052078, mode=Mode.SUBTRACT)

    # Chamfer5
    chamfer5_edges = [part.edges().sort_by_distance(p)[0] for p in [
        (-16.328383402, 6, -3.009569189),
        (-16.328383402, 6, -8.272957354),
    ]]
    chamfer(chamfer5_edges, length=CHAMFER5_SIZE)


solid = part.part
